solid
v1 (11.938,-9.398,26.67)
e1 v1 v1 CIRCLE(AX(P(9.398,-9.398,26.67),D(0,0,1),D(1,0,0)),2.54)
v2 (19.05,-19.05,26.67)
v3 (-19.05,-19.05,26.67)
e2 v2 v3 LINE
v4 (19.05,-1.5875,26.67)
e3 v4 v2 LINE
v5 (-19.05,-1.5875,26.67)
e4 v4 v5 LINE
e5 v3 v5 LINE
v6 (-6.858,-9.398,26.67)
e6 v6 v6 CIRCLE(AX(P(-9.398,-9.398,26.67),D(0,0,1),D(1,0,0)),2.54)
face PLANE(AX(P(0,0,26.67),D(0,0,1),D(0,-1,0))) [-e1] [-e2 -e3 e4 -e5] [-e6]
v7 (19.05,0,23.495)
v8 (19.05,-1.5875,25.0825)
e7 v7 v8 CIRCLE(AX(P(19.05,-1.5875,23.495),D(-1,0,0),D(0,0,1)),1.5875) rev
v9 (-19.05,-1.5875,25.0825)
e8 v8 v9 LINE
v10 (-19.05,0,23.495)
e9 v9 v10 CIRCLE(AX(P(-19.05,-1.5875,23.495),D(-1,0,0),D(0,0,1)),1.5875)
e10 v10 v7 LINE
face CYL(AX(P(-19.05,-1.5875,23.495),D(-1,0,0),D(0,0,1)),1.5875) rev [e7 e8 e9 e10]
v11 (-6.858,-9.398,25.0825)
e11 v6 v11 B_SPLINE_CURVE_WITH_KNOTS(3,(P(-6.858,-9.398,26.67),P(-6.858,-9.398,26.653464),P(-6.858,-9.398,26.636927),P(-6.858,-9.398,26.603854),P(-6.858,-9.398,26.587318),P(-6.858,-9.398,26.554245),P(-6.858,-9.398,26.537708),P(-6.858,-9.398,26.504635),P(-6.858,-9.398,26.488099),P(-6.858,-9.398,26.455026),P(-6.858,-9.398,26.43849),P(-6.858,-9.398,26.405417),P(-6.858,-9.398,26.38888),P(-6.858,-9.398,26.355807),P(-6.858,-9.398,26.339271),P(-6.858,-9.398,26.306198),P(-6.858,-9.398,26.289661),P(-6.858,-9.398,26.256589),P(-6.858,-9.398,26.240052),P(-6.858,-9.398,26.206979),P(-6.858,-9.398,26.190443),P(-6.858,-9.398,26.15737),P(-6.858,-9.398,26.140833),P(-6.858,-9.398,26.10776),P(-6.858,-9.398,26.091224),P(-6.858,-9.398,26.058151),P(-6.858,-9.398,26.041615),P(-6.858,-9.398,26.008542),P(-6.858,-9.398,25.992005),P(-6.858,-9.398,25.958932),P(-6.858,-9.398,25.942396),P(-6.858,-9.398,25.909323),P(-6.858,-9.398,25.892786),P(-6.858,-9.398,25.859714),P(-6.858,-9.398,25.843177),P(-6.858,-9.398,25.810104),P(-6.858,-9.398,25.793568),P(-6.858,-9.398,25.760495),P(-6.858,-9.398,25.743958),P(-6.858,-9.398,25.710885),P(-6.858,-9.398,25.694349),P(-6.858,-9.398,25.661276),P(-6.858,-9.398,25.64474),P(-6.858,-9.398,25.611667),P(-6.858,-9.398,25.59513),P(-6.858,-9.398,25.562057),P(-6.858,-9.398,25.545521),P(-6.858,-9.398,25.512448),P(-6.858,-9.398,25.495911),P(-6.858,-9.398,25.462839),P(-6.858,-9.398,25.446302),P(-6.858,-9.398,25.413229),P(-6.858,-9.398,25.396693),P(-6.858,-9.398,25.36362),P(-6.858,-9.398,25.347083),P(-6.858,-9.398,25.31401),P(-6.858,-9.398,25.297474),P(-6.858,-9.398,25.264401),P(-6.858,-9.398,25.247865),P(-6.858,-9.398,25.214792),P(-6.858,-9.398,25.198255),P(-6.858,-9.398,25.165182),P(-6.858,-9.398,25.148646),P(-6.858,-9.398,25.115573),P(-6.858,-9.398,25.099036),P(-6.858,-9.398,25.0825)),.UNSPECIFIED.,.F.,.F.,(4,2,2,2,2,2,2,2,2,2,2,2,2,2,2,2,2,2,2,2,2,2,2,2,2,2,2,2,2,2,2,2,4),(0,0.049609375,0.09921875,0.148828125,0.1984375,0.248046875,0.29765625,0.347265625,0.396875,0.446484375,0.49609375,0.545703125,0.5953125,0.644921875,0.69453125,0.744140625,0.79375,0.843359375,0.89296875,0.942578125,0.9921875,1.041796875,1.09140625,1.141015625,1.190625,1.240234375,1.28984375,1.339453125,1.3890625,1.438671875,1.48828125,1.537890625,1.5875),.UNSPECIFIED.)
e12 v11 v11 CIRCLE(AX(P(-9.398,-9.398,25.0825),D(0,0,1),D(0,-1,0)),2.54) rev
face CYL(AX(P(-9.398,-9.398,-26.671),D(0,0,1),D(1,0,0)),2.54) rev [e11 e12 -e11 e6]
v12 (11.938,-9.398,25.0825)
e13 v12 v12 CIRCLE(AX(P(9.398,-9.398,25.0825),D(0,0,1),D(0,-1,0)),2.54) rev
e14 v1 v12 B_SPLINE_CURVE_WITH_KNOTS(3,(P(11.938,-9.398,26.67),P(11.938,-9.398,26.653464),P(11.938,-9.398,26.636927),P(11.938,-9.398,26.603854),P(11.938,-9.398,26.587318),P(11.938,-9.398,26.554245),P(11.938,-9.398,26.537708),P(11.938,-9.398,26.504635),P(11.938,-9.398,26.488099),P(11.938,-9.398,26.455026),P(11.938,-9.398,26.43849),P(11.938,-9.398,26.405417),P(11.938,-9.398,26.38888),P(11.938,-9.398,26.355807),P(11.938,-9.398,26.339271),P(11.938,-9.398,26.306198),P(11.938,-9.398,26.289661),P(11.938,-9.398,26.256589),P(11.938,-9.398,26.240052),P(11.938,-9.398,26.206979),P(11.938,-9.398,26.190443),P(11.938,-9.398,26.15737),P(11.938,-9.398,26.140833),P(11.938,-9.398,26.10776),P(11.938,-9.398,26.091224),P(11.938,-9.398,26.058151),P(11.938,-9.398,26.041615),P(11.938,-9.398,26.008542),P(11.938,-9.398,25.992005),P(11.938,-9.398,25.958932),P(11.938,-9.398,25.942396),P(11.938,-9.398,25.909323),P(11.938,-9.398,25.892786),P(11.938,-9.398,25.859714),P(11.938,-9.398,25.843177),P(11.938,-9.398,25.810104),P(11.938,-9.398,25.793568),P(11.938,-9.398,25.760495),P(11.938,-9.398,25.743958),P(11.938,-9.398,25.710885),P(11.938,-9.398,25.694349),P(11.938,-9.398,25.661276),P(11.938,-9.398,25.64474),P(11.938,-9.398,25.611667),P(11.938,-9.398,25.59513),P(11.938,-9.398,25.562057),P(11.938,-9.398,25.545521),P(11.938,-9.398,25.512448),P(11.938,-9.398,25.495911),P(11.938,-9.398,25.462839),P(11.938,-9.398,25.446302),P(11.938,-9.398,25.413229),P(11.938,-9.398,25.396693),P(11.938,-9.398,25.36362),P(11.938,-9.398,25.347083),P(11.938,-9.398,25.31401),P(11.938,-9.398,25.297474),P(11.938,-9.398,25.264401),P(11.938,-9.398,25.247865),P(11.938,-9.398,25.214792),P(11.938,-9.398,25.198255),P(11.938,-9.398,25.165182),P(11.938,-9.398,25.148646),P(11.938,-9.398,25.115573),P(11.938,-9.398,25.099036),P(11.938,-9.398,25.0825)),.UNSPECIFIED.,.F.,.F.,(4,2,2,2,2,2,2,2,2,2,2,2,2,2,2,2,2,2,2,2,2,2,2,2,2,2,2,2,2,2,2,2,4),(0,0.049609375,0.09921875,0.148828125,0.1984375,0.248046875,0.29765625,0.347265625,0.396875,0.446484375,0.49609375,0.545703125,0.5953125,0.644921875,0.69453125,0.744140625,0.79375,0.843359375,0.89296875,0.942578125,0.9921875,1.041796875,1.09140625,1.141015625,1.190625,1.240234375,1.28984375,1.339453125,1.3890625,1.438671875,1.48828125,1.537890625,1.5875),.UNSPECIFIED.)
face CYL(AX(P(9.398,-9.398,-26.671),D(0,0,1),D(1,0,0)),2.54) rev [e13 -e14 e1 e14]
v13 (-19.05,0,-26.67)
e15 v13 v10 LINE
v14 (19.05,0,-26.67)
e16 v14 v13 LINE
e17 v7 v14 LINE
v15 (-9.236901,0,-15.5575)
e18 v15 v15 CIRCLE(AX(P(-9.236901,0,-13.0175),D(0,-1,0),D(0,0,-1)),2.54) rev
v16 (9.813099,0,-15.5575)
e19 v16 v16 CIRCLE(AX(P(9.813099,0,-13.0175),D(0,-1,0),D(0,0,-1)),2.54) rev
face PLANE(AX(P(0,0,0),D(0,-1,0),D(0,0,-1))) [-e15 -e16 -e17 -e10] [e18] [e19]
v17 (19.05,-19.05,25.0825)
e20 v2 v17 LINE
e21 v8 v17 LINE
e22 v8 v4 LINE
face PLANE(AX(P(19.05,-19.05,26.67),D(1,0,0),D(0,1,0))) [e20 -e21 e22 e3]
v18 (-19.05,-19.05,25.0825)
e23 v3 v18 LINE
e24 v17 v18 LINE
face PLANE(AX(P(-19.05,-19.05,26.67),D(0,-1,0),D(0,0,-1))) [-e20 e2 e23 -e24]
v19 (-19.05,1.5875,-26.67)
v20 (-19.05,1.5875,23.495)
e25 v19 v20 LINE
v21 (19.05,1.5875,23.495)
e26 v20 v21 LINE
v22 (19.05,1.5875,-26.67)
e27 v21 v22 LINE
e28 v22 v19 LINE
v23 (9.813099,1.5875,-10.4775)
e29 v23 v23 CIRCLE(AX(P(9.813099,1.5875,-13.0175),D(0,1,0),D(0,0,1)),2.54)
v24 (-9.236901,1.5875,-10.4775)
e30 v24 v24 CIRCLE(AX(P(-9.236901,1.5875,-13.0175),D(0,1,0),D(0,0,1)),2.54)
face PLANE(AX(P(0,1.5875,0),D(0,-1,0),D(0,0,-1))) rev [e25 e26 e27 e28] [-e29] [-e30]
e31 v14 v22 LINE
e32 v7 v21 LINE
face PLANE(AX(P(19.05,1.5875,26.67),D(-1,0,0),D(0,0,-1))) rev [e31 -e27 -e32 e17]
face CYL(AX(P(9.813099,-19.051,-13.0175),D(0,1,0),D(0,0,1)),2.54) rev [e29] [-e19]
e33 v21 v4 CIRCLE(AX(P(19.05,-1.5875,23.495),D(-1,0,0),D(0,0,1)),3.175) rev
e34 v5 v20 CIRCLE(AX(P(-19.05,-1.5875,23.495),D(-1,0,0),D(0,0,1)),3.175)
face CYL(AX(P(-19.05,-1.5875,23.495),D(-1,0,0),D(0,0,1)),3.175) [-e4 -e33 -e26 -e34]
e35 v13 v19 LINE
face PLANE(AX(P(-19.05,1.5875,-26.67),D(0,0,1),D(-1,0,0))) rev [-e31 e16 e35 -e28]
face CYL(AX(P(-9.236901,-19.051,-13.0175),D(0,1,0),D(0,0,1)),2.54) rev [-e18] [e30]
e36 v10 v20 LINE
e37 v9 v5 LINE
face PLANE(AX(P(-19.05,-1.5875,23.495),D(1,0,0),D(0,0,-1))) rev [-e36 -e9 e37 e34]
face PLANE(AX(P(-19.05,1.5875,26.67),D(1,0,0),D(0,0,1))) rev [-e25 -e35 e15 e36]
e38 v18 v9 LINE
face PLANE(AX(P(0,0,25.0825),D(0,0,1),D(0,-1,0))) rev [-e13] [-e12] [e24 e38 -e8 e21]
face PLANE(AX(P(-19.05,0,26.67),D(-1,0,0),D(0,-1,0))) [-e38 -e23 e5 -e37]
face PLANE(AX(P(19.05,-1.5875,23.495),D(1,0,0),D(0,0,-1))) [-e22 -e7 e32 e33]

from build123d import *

# Parameters (mm, degrees)
SKETCH1_W                    = 38.1
SKETCH1_H                    = 53.34
BOSS_EXTRUDE1_DEPTH          = 1.5875
EDGE_FLANGE1_STRIP_W         = 9.525
EDGE_FLANGE1_STRIP_H         = 1.5875
EDGE_FLANGE1_STRIP_CUT_DEPTH = 38.1
EDGE_FLANGE1_DEPTH           = 38.1
CUT_EXTRUDE1_REACH           = 40.731
SKETCH9_R                    = 2.54
CUT_EXTRUDE2_REACH           = 61.758
SKETCH11_R                   = 2.54


# Sheet-metal steps are written as plain solids
with BuildPart() as part:
    # Sketch1 → Boss-Extrude1 (new body)
    with BuildSketch(Plane(origin=(0, 0, 0), x_dir=(1, 0, 0), z_dir=(0, 1, 0))):
        Rectangle(SKETCH1_W, SKETCH1_H)
    extrude(amount=BOSS_EXTRUDE1_DEPTH)

    # Edge-Flange1 strip (across the edge) → Edge-Flange1 strip cut (cut)
    with BuildSketch(Plane(origin=(19.05, 0, 26.67), x_dir=(0, 0, -1), z_dir=(-1, 0, 0))):
        with Locations((-1.5875, -0.79375)):
            Rectangle(EDGE_FLANGE1_STRIP_W, EDGE_FLANGE1_STRIP_H)
    extrude(amount=EDGE_FLANGE1_STRIP_CUT_DEPTH, mode=Mode.SUBTRACT)

    # Edge-Flange1 section (across the edge) → Edge-Flange1 (add)
    with BuildSketch(Plane(origin=(19.05, 0, 26.67), x_dir=(0, 0, -1), z_dir=(-1, 0, 0))):
        with BuildLine():
            Line((0, 1.5875), (0, 19.05))
            Line((0, 19.05), (1.5875, 19.05))
            Line((1.5875, 19.05), (1.5875, 1.5875))
            ThreePointArc((1.5875, 1.5875), (2.052467985, 0.464967985), (3.175, 0))
            Line((3.175, 0), (3.175, -1.5875))
            ThreePointArc((3.175, -1.5875), (0.92993597, -0.65756403), (0, 1.5875))
        make_face()
    extrude(amount=EDGE_FLANGE1_DEPTH)

    # Sketch9 → Cut-Extrude1 (cut, up to next)
    with BuildSketch(Plane(origin=(0, 1.5875, 0), x_dir=(1, 0, 0), z_dir=(0, 1, 0)), mode=Mode.PRIVATE) as cut_extrude1_sk1:
        with Locations(Location((9.813099354, 13.0175, 0), (0, 0, 270))):
            Circle(SKETCH9_R)
    cut_extrude1_tool1 = extrude(cut_extrude1_sk1.sketch, amount=-CUT_EXTRUDE1_REACH, mode=Mode.PRIVATE) & part.part
    # Sketch9 → Cut-Extrude1 (cut, up to next)
    with BuildSketch(Plane(origin=(0, 1.5875, 0), x_dir=(1, 0, 0), z_dir=(0, 1, 0)), mode=Mode.PRIVATE) as cut_extrude1_sk2:
        with Locations(Location((-9.236900646, 13.0175, 0), (0, 0, 270))):
            Circle(SKETCH9_R)
    cut_extrude1_tool2 = extrude(cut_extrude1_sk2.sketch, amount=-CUT_EXTRUDE1_REACH, mode=Mode.PRIVATE) & part.part
    add(cut_extrude1_tool1.solids().sort_by_distance((9.813099, 1.5875, -13.0175))[0], mode=Mode.SUBTRACT)
    add(cut_extrude1_tool2.solids().sort_by_distance((-9.236901, 1.5875, -13.0175))[0], mode=Mode.SUBTRACT)

    # Sketch11 → Cut-Extrude2 (cut, up to next)
    with BuildSketch(Plane.XY.offset(26.67), mode=Mode.PRIVATE) as cut_extrude2_sk1:
        with Locations((-9.398, -9.398)):
            Circle(SKETCH11_R)
    cut_extrude2_tool1 = extrude(cut_extrude2_sk1.sketch, amount=-CUT_EXTRUDE2_REACH, mode=Mode.PRIVATE) & part.part
    # Sketch11 → Cut-Extrude2 (cut, up to next)
    with BuildSketch(Plane.XY.offset(26.67), mode=Mode.PRIVATE) as cut_extrude2_sk2:
        with Locations((9.398, -9.398)):
            Circle(SKETCH11_R)
    cut_extrude2_tool2 = extrude(cut_extrude2_sk2.sketch, amount=-CUT_EXTRUDE2_REACH, mode=Mode.PRIVATE) & part.part
    add(cut_extrude2_tool1.solids().sort_by_distance((-9.398, -9.398, 26.67))[0], mode=Mode.SUBTRACT)
    add(cut_extrude2_tool2.solids().sort_by_distance((9.398, -9.398, 26.67))[0], mode=Mode.SUBTRACT)


solid = part.part
